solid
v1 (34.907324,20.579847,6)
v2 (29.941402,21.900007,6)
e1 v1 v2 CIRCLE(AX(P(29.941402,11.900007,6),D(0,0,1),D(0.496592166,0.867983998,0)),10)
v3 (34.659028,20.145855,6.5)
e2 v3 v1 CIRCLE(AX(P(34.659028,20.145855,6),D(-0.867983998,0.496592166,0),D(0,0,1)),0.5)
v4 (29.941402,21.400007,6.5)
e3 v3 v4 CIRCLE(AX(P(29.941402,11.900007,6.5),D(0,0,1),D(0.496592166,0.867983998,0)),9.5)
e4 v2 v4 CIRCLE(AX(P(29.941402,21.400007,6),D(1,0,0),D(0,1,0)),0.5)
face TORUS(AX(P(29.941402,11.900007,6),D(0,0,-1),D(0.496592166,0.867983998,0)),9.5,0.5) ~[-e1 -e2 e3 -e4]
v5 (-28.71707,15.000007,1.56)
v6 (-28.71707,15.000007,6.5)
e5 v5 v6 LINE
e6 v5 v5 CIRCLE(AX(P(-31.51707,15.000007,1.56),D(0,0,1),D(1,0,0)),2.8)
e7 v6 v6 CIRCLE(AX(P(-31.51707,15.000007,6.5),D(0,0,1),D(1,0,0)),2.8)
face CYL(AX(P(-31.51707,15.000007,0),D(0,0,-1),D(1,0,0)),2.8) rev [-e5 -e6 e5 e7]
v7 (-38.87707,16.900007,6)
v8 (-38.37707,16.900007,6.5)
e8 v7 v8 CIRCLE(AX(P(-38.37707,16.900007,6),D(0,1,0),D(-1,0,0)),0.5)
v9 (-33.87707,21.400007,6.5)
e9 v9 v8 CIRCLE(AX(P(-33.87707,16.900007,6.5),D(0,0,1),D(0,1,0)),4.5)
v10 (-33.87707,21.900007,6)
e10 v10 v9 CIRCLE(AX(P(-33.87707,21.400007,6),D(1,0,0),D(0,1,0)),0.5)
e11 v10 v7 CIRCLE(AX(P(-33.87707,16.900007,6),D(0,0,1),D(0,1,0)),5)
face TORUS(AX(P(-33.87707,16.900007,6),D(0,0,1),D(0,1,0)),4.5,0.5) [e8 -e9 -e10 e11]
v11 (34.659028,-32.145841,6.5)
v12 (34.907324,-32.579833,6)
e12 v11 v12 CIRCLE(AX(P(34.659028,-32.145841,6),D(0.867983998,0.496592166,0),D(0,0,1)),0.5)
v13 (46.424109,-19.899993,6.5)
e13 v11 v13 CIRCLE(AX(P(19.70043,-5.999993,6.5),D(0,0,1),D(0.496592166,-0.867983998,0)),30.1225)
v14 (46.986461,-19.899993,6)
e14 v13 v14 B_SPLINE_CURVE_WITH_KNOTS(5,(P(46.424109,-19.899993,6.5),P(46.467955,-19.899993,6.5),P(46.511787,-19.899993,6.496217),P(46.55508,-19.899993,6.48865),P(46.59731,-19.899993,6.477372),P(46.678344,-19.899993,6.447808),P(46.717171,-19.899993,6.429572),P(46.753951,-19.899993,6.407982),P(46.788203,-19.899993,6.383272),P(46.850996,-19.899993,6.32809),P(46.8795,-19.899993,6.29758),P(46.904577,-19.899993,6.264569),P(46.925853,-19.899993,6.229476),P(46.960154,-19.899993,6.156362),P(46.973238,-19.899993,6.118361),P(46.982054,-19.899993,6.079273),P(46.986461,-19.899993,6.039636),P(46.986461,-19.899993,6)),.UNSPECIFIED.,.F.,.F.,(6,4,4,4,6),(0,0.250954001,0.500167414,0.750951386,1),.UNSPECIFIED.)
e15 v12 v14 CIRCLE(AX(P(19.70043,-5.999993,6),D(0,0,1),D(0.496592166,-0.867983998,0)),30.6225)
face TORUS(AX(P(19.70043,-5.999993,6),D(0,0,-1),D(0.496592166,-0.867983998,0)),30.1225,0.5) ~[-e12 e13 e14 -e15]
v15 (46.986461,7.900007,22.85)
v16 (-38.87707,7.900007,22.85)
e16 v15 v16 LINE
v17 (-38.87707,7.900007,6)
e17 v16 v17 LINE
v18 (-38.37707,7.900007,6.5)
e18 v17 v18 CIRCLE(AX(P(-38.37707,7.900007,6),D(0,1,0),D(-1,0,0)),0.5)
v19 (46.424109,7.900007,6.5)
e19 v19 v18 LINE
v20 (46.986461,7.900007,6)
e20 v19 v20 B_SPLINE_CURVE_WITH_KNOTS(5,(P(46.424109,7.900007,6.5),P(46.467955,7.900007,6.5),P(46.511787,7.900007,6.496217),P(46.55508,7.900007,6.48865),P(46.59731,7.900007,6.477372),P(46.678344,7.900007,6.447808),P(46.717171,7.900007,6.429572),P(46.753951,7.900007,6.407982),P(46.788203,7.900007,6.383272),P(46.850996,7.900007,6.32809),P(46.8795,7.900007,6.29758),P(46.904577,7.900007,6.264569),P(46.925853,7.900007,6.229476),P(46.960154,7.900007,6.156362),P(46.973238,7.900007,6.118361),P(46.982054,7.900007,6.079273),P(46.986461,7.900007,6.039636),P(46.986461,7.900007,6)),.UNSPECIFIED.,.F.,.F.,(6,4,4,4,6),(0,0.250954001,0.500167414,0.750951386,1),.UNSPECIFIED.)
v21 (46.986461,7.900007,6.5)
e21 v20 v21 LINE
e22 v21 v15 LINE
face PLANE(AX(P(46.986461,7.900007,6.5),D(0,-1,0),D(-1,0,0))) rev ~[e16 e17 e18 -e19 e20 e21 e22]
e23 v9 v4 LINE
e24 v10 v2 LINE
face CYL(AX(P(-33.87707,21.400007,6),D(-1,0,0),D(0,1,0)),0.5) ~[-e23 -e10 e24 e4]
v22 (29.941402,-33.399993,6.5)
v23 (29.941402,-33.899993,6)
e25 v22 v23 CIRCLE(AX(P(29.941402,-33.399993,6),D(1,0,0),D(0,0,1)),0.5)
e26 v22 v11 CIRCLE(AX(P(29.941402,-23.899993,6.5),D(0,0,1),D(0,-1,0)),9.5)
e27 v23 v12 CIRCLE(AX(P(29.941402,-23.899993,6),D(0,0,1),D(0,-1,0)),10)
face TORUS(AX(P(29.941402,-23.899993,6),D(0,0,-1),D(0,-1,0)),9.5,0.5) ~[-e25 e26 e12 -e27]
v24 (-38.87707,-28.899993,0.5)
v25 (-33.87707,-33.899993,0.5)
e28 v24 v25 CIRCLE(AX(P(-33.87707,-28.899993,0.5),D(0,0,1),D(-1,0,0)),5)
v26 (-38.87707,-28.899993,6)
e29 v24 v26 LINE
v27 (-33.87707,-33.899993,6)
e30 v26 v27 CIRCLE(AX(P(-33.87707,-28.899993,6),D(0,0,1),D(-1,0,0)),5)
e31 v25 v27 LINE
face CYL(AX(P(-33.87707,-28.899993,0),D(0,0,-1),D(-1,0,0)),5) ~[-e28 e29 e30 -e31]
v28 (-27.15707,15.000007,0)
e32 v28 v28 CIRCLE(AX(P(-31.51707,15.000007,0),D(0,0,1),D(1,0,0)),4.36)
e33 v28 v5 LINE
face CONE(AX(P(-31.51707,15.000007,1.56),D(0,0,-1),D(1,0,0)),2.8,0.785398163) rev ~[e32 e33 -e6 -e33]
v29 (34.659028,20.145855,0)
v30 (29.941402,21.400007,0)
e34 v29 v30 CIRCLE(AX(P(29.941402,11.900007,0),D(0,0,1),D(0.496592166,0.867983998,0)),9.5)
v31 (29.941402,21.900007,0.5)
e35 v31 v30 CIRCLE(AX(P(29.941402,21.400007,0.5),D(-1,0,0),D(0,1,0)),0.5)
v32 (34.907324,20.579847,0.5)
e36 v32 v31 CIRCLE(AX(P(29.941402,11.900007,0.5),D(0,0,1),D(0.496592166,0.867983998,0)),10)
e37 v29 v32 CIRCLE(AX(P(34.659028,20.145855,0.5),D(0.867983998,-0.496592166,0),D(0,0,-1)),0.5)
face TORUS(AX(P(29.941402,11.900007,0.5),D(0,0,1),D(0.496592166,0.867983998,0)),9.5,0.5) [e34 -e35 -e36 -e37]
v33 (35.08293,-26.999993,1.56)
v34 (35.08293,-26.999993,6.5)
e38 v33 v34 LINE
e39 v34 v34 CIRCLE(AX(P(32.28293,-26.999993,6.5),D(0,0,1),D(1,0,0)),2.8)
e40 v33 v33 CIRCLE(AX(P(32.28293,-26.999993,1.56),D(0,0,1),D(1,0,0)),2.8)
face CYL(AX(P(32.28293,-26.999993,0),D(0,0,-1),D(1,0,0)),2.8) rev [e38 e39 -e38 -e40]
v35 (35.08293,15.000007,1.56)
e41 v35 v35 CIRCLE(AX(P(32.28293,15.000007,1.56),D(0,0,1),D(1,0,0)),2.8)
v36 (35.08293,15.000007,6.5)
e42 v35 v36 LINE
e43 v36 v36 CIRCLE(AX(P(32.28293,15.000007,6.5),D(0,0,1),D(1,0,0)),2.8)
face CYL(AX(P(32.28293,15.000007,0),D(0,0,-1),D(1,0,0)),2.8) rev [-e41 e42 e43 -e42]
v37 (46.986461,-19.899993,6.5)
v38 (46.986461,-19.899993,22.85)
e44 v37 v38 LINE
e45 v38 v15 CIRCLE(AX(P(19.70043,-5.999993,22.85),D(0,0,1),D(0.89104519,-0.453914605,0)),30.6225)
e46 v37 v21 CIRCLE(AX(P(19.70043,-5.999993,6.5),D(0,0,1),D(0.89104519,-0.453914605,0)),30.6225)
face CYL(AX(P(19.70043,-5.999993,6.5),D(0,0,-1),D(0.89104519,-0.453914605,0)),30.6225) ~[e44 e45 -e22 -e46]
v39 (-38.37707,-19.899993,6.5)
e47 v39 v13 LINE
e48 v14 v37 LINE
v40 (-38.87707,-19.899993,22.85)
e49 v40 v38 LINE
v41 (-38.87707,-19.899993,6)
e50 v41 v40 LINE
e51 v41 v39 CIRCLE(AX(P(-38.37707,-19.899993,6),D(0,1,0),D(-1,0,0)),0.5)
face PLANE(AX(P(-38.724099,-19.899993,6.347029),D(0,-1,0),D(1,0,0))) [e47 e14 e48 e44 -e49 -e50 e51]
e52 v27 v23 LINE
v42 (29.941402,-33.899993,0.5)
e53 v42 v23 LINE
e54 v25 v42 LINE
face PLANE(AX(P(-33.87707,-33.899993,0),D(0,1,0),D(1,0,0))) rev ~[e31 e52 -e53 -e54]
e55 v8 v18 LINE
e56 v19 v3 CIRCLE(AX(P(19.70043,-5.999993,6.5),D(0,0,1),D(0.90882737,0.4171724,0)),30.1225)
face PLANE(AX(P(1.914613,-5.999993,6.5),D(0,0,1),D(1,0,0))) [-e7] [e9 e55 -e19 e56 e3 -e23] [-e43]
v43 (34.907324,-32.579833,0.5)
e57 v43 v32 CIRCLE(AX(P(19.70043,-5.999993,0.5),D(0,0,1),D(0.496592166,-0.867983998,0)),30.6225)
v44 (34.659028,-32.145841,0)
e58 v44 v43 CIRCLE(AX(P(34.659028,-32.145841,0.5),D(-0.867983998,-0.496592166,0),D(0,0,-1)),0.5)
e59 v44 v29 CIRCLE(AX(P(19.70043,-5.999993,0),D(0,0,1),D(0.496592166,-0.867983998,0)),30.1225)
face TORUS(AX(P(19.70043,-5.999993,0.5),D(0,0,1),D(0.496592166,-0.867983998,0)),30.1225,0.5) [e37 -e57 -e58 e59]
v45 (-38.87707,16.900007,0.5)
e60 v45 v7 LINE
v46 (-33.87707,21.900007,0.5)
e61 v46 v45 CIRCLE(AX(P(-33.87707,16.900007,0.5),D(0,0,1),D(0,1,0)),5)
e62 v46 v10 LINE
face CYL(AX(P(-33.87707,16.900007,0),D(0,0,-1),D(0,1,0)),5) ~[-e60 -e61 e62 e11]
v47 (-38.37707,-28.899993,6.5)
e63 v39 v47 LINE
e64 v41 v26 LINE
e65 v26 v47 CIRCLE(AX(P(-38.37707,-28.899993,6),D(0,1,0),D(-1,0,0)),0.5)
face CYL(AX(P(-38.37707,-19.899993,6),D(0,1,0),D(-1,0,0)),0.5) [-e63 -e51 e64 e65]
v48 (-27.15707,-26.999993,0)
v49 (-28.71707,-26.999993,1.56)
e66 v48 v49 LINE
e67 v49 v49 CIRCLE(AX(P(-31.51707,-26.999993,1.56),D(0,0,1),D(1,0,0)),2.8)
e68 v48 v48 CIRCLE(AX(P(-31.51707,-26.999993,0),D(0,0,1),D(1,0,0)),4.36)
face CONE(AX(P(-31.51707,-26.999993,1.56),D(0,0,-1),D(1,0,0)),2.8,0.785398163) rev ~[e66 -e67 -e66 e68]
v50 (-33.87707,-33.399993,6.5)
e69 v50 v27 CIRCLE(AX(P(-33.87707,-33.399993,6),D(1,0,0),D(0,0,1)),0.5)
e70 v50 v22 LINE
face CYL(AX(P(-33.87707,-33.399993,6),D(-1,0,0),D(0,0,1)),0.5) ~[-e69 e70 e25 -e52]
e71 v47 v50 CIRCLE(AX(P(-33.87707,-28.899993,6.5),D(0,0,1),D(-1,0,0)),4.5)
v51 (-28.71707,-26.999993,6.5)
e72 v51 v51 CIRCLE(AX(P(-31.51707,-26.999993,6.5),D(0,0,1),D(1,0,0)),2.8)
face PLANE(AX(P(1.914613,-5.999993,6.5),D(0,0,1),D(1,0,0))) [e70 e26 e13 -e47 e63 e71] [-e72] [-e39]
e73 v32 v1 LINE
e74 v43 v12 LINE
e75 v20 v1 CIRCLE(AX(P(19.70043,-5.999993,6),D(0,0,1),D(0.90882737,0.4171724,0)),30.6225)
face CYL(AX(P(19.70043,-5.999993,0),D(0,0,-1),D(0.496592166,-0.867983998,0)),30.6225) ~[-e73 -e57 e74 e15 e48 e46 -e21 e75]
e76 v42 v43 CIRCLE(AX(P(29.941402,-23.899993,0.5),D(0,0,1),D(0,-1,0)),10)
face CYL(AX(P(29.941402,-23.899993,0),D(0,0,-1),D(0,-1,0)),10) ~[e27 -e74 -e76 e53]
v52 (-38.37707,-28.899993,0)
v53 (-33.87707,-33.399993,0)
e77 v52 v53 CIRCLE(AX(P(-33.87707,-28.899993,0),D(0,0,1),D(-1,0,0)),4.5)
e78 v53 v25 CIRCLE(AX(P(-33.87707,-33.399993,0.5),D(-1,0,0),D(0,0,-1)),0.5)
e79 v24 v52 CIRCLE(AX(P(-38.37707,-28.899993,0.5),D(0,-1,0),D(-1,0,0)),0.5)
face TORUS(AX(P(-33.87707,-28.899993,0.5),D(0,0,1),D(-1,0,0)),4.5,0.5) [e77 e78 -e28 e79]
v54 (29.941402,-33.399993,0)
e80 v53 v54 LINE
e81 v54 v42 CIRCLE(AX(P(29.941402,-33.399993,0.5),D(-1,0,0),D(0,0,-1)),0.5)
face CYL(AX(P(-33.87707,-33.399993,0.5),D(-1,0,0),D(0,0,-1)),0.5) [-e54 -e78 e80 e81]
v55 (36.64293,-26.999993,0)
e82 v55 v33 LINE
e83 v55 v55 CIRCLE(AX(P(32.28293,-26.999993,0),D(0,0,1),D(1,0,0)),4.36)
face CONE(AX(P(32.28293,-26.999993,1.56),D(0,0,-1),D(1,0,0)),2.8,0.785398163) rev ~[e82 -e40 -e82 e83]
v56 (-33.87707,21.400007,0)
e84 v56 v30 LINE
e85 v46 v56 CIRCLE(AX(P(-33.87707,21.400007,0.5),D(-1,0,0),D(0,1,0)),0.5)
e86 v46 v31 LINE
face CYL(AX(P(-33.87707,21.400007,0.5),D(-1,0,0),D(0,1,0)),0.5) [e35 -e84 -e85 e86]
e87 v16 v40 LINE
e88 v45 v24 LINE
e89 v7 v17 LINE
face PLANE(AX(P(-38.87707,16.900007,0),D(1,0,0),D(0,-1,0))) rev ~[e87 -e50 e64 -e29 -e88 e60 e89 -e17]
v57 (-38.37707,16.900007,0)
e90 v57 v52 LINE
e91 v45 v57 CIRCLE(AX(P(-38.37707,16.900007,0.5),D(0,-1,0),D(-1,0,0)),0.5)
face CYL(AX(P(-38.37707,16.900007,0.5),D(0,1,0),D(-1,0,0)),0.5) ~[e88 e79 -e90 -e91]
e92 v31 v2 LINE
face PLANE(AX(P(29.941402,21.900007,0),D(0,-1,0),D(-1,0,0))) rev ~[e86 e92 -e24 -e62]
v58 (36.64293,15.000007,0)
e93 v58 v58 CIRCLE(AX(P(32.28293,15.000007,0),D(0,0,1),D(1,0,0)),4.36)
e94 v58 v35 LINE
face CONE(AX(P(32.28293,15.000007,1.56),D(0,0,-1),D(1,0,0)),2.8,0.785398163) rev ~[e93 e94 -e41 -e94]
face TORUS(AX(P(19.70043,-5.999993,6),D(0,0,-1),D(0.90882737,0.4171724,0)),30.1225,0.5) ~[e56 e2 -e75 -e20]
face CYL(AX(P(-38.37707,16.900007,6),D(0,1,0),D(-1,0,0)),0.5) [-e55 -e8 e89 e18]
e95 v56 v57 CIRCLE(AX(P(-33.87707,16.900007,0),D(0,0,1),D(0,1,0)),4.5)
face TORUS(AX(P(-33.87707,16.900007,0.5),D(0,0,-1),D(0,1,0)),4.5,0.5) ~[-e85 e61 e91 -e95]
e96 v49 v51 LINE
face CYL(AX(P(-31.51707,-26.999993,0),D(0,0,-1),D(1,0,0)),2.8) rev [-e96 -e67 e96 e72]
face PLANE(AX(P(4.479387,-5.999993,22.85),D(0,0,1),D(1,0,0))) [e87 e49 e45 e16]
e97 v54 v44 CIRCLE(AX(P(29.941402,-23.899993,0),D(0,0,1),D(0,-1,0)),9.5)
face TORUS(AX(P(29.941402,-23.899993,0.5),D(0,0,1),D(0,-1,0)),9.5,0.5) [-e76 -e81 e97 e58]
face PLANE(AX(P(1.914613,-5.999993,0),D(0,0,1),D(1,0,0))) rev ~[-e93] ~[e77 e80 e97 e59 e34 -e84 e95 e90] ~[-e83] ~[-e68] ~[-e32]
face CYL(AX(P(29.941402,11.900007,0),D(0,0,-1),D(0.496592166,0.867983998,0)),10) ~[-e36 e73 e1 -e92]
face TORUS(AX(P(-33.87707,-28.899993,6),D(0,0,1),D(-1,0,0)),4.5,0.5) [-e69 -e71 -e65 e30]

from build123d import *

# Parameters (mm, degrees)
F0_R         = 2.8
F1_DEPTH     = 6.5
F3_DEPTH     = 16.35
F4_T1_DEPTH  = 63.8184719387
F4_T3_DEPTH  = 45.8
F4_T5_DEPTH  = 9
F4_T7_DEPTH  = 9
F4_T10_ANGLE = 90
F4_T12_ANGLE = 120.4504110916
F4_T14_ANGLE = 90
F4_T16_ANGLE = 90
F4_T18_ANGLE = 29.7747944542
F4_T20_ANGLE = 29.7747944542
F4_T22_ANGLE = 29.7747944542
F4_T26_ANGLE = 35.5690080159
F4_T29_ANGLE = 90
F4_T33_ANGLE = 35.5690080159
F4_T36_ANGLE = 29.7747944542
F5_SIZE      = 1.56


# Not quite as in the source:
# - a fillet or chamfer that OpenCascade refuses, or shapes differently, is made with other operations: its cross-section is extruded or revolved along the edge and cut away or added


with BuildPart() as f1:
    # F0 (on Top) → F1 (new body)
    with BuildSketch(Plane.XY):
        with BuildLine():
            Line((-38.8770699501, 16.9000072956), (-38.8770699501, -28.8999927044))
            ThreePointArc((-38.8770699501, -28.8999927044), (-37.412603856, -32.4355266103), (-33.8770699501, -33.8999927044))
            Line((-33.8770699501, -33.8999927044), (29.9414019886, -33.8999927044))
            ThreePointArc((29.9414019886, -33.8999927044), (32.5106042183, -33.5643188528), (34.9073236464, -32.579832685))
            ThreePointArc((34.9073236464, -32.579832685), (50.3229300499, -5.9999927044), (34.9073236464, 20.5798472762))
            ThreePointArc((34.9073236464, 20.5798472762), (32.5106042183, 21.564333444), (29.9414019886, 21.9000072956))
            Line((29.9414019886, 21.9000072956), (-33.8770699501, 21.9000072956))
            ThreePointArc((-33.8770699501, 21.9000072956), (-37.412603856, 20.4355412015), (-38.8770699501, 16.9000072956))
        make_face()
        with Locations((-31.5170697868, -26.9999932498)):
            Circle(F0_R, mode=Mode.SUBTRACT)
        with Locations((32.2829300499, -26.9999927044)):
            Circle(F0_R, mode=Mode.SUBTRACT)
        with Locations((-31.5170697868, 15.0000071153)):
            Circle(F0_R, mode=Mode.SUBTRACT)
        with Locations((32.2829300499, 15.0000072956)):
            Circle(F0_R, mode=Mode.SUBTRACT)
    extrude(amount=F1_DEPTH)

    # F2 (on face) → F3 (join)
    with BuildSketch(Plane.XY.offset(6.5)):
        with BuildLine():
            Line((-38.8770699501, 7.9000072956), (-38.8770699501, -5.9999927044))
            Line((-38.8770699501, -5.9999927044), (-38.8770699501, -19.8999927044))
            Line((-38.8770699501, -19.8999927044), (46.9864613892, -19.8999927044))
            ThreePointArc((46.9864613892, -19.8999927044), (50.3229300499, -5.9999927044), (46.9864613892, 7.9000072956))
            Line((46.9864613892, 7.9000072956), (-38.8770699501, 7.9000072956))
        make_face()
    extrude(amount=F3_DEPTH)

    # F4: fillet of radius 0.5 on 18 edges, made by hand

    # F4_s2 → F4_t1 (cut)
    with BuildSketch(Plane.YZ.offset(-33.8770699501)):
        with BuildLine():
            ThreePointArc((21.9000072956, 0.5), (21.7535606862, 0.1464466094), (21.4000072956, 0))
            Line((21.4000072956, 0), (21.9000072956, 0))
            Line((21.9000072956, 0), (21.9000072956, 0.5))
        make_face()
        with BuildLine():
            ThreePointArc((21.9000072956, 6), (21.7535606862, 6.3535533906), (21.4000072956, 6.5))
            Line((21.4000072956, 6.5), (21.9000072956, 6.5))
            Line((21.9000072956, 6.5), (21.9000072956, 6))
        make_face()
        with BuildLine():
            ThreePointArc((-33.3999927044, 6.5), (-33.753546095, 6.3535533906), (-33.8999927044, 6))
            Line((-33.8999927044, 6), (-33.8999927044, 6.5))
            Line((-33.8999927044, 6.5), (-33.3999927044, 6.5))
        make_face()
        with BuildLine():
            ThreePointArc((-33.3999927044, 0), (-33.753546095, 0.1464466094), (-33.8999927044, 0.5))
            Line((-33.8999927044, 0.5), (-33.8999927044, 0))
            Line((-33.8999927044, 0), (-33.3999927044, 0))
        make_face()
    extrude(amount=F4_T1_DEPTH, mode=Mode.SUBTRACT)

    # F4_s4 → F4_t3 (cut)
    with BuildSketch(Plane.XZ.offset(-16.9000072956)):
        with BuildLine():
            ThreePointArc((-38.8770699501, 0.5), (-38.7306233407, 0.1464466094), (-38.3770699501, 0))
            Line((-38.3770699501, 0), (-38.8770699501, 0))
            Line((-38.8770699501, 0), (-38.8770699501, 0.5))
        make_face()
    extrude(amount=F4_T3_DEPTH, mode=Mode.SUBTRACT)

    # F4_s6 → F4_t5 (cut)
    with BuildSketch(Plane.XZ.offset(-16.9000072956)):
        with BuildLine():
            ThreePointArc((-38.8770699501, 6), (-38.7306233407, 6.3535533906), (-38.3770699501, 6.5))
            Line((-38.3770699501, 6.5), (-38.8770699501, 6.5))
            Line((-38.8770699501, 6.5), (-38.8770699501, 6))
        make_face()
    extrude(amount=F4_T5_DEPTH, mode=Mode.SUBTRACT)

    # F4_s8 → F4_t7 (cut)
    with BuildSketch(Plane.XZ.offset(19.8999927044)):
        with BuildLine():
            ThreePointArc((-38.8770699501, 6), (-38.7306233407, 6.3535533906), (-38.3770699501, 6.5))
            Line((-38.3770699501, 6.5), (-38.8770699501, 6.5))
            Line((-38.8770699501, 6.5), (-38.8770699501, 6))
        make_face()
    extrude(amount=F4_T7_DEPTH, mode=Mode.SUBTRACT)

    # F4_s9 → F4_t10 (revolve, cut)
    with BuildSketch(Plane.YZ.offset(-33.8770699501)):
        with BuildLine():
            ThreePointArc((21.9000072956, 0.5), (21.7535606862, 0.1464466094), (21.4000072956, 0))
            Line((21.4000072956, 0), (21.9000072956, 0))
            Line((21.9000072956, 0), (21.9000072956, 0.5))
        make_face()
    revolve(axis=Axis((-33.8770699501, 16.9000072956, 0), (0, 0, 1)), revolution_arc=F4_T10_ANGLE, mode=Mode.SUBTRACT)

    # F4_s11 → F4_t12 (revolve, cut)
    with BuildSketch(Plane(origin=(12.2560283734, 7.0119353437, 0), x_dir=(0, 0, 1), z_dir=(-0.8679839981, -0.4965921658, 0))):
        with BuildLine():
            ThreePointArc((0, -45.1134768811), (0.1464466094, -45.4670302717), (0.5, -45.6134768811))
            Line((0.5, -45.6134768811), (0, -45.6134768811))
            Line((0, -45.6134768811), (0, -45.1134768811))
        make_face()
    revolve(axis=Axis((19.7004300499, -5.9999927044, 0), (0, 0, 1)), revolution_arc=F4_T12_ANGLE, mode=Mode.SUBTRACT)

    # F4_s13 → F4_t14 (revolve, cut)
    with BuildSketch(Plane.YZ.offset(-33.8770699501)):
        with BuildLine():
            ThreePointArc((21.9000072956, 6), (21.7535606862, 6.3535533906), (21.4000072956, 6.5))
            Line((21.4000072956, 6.5), (21.9000072956, 6.5))
            Line((21.9000072956, 6.5), (21.9000072956, 6))
        make_face()
    revolve(axis=Axis((-33.8770699501, 16.9000072956, 6.5), (0, 0, 1)), revolution_arc=F4_T14_ANGLE, mode=Mode.SUBTRACT)

    # F4_s15 → F4_t16 (revolve, cut)
    with BuildSketch(Plane.XZ.offset(28.8999927044)):
        with BuildLine():
            ThreePointArc((-38.3770699501, 0), (-38.7306233407, 0.1464466094), (-38.8770699501, 0.5))
            Line((-38.8770699501, 0.5), (-38.8770699501, 0))
            Line((-38.8770699501, 0), (-38.3770699501, 0))
        make_face()
    revolve(axis=Axis((-33.8770699501, -28.8999927044, 0), (0, 0, 1)), revolution_arc=F4_T16_ANGLE, mode=Mode.SUBTRACT)

    # F4_s17 → F4_t18 (revolve, cut)
    with BuildSketch(Plane.YZ.offset(29.9414019886)):
        with BuildLine():
            ThreePointArc((-33.3999927044, 0), (-33.753546095, 0.1464466094), (-33.8999927044, 0.5))
            Line((-33.8999927044, 0.5), (-33.8999927044, 0))
            Line((-33.8999927044, 0), (-33.3999927044, 0))
        make_face()
    revolve(axis=Axis((29.9414019886, -23.8999927044, 0), (0, 0, 1)), revolution_arc=F4_T18_ANGLE, mode=Mode.SUBTRACT)

    # F4_s19 → F4_t20 (revolve, cut)
    with BuildSketch(Plane(origin=(17.4284307256, -9.9711770948, 0), x_dir=(0, 0, 1), z_dir=(0.8679839981, -0.4965921658, 0))):
        with BuildLine():
            ThreePointArc((0, -34.6976815693), (0.1464466094, -35.0512349599), (0.5, -35.1976815693))
            Line((0.5, -35.1976815693), (0, -35.1976815693))
            Line((0, -35.1976815693), (0, -34.6976815693))
        make_face()
    revolve(axis=Axis((29.9414019886, 11.9000072956, 0), (0, 0, 1)), revolution_arc=F4_T20_ANGLE, mode=Mode.SUBTRACT)

    # F4_s21 → F4_t22 (revolve, cut)
    with BuildSketch(Plane(origin=(17.4284307256, -9.9711770948, 0), x_dir=(0, 0, 1), z_dir=(0.8679839981, -0.4965921658, 0))):
        with BuildLine():
            ThreePointArc((6.5, -34.6976815693), (6.3535533906, -35.0512349599), (6, -35.1976815693))
            Line((6, -35.1976815693), (6.5, -35.1976815693))
            Line((6.5, -35.1976815693), (6.5, -34.6976815693))
        make_face()
    revolve(axis=Axis((29.9414019886, 11.9000072956, 6.5), (0, 0, 1)), revolution_arc=F4_T22_ANGLE, mode=Mode.SUBTRACT)


with BuildPart() as f4_tool24:
    # F4_s25 → F4_t26 (revolve)
    with BuildSketch(Plane(origin=(5.7033446243, -12.4249727464, 0), x_dir=(0, 0, 1), z_dir=(0.4171723997, -0.9088273703, 0))):
        with BuildLine():
            ThreePointArc((6.5, -45.5237586807), (6.3535533906, -45.8773120713), (6, -46.0237586807))
            Line((6, -46.0237586807), (6.5, -46.0237586807))
            Line((6.5, -46.0237586807), (6.5, -45.5237586807))
        make_face()
    revolve(axis=Axis((19.7004300499, -5.9999927044, 6.5), (0, 0, 1)), revolution_arc=F4_T26_ANGLE)

    split(bisect_by=Plane.XZ.offset(-7.9000072956), keep=Keep.BOTTOM)


with BuildPart() as f1_1:
    add(f1.part)

    # F4_t23: cut F4_tool24
    add(f4_tool24.part, mode=Mode.SUBTRACT)

    # F4_s28 → F4_t29 (revolve, cut)
    with BuildSketch(Plane.XZ.offset(28.8999927044)):
        with BuildLine():
            ThreePointArc((-38.8770699501, 6), (-38.7306233407, 6.3535533906), (-38.3770699501, 6.5))
            Line((-38.3770699501, 6.5), (-38.8770699501, 6.5))
            Line((-38.8770699501, 6.5), (-38.8770699501, 6))
        make_face()
    revolve(axis=Axis((-33.8770699501, -28.8999927044, 6.5), (0, 0, 1)), revolution_arc=F4_T29_ANGLE, mode=Mode.SUBTRACT)


with BuildPart() as f4_tool31:
    # F4_s32 → F4_t33 (revolve)
    with BuildSketch(Plane(origin=(12.2560283734, 7.0119353437, 0), x_dir=(0, 0, 1), z_dir=(-0.8679839981, -0.4965921658, 0))):
        with BuildLine():
            ThreePointArc((6.5, -45.1134768811), (6.3535533906, -45.4670302717), (6, -45.6134768811))
            Line((6, -45.6134768811), (6.5, -45.6134768811))
            Line((6.5, -45.6134768811), (6.5, -45.1134768811))
        make_face()
    revolve(axis=Axis((19.7004300499, -5.9999927044, 6.5), (0, 0, 1)), revolution_arc=F4_T33_ANGLE)

    split(bisect_by=Plane.XZ.offset(19.8999927044), keep=Keep.TOP)


with BuildPart() as f1_2:
    add(f1_1.part)

    # F4_t30: cut F4_tool31
    add(f4_tool31.part, mode=Mode.SUBTRACT)

    # F4_s35 → F4_t36 (revolve, cut)
    with BuildSketch(Plane.YZ.offset(29.9414019886)):
        with BuildLine():
            ThreePointArc((-33.3999927044, 6.5), (-33.753546095, 6.3535533906), (-33.8999927044, 6))
            Line((-33.8999927044, 6), (-33.8999927044, 6.5))
            Line((-33.8999927044, 6.5), (-33.3999927044, 6.5))
        make_face()
    revolve(axis=Axis((29.9414019886, -23.8999927044, 6.5), (0, 0, 1)), revolution_arc=F4_T36_ANGLE, mode=Mode.SUBTRACT)

    # F5
    f5_edges = [f1_2.edges().sort_by_distance(p)[0] for p in [
        (-34.31707, 15.000007, 0),
        (-34.31707, -26.999993, 0),
        (29.48293, -26.999993, 0),
        (29.48293, 15.000007, 0),
    ]]
    chamfer(f5_edges, length=F5_SIZE)


solid = f1_2.part
